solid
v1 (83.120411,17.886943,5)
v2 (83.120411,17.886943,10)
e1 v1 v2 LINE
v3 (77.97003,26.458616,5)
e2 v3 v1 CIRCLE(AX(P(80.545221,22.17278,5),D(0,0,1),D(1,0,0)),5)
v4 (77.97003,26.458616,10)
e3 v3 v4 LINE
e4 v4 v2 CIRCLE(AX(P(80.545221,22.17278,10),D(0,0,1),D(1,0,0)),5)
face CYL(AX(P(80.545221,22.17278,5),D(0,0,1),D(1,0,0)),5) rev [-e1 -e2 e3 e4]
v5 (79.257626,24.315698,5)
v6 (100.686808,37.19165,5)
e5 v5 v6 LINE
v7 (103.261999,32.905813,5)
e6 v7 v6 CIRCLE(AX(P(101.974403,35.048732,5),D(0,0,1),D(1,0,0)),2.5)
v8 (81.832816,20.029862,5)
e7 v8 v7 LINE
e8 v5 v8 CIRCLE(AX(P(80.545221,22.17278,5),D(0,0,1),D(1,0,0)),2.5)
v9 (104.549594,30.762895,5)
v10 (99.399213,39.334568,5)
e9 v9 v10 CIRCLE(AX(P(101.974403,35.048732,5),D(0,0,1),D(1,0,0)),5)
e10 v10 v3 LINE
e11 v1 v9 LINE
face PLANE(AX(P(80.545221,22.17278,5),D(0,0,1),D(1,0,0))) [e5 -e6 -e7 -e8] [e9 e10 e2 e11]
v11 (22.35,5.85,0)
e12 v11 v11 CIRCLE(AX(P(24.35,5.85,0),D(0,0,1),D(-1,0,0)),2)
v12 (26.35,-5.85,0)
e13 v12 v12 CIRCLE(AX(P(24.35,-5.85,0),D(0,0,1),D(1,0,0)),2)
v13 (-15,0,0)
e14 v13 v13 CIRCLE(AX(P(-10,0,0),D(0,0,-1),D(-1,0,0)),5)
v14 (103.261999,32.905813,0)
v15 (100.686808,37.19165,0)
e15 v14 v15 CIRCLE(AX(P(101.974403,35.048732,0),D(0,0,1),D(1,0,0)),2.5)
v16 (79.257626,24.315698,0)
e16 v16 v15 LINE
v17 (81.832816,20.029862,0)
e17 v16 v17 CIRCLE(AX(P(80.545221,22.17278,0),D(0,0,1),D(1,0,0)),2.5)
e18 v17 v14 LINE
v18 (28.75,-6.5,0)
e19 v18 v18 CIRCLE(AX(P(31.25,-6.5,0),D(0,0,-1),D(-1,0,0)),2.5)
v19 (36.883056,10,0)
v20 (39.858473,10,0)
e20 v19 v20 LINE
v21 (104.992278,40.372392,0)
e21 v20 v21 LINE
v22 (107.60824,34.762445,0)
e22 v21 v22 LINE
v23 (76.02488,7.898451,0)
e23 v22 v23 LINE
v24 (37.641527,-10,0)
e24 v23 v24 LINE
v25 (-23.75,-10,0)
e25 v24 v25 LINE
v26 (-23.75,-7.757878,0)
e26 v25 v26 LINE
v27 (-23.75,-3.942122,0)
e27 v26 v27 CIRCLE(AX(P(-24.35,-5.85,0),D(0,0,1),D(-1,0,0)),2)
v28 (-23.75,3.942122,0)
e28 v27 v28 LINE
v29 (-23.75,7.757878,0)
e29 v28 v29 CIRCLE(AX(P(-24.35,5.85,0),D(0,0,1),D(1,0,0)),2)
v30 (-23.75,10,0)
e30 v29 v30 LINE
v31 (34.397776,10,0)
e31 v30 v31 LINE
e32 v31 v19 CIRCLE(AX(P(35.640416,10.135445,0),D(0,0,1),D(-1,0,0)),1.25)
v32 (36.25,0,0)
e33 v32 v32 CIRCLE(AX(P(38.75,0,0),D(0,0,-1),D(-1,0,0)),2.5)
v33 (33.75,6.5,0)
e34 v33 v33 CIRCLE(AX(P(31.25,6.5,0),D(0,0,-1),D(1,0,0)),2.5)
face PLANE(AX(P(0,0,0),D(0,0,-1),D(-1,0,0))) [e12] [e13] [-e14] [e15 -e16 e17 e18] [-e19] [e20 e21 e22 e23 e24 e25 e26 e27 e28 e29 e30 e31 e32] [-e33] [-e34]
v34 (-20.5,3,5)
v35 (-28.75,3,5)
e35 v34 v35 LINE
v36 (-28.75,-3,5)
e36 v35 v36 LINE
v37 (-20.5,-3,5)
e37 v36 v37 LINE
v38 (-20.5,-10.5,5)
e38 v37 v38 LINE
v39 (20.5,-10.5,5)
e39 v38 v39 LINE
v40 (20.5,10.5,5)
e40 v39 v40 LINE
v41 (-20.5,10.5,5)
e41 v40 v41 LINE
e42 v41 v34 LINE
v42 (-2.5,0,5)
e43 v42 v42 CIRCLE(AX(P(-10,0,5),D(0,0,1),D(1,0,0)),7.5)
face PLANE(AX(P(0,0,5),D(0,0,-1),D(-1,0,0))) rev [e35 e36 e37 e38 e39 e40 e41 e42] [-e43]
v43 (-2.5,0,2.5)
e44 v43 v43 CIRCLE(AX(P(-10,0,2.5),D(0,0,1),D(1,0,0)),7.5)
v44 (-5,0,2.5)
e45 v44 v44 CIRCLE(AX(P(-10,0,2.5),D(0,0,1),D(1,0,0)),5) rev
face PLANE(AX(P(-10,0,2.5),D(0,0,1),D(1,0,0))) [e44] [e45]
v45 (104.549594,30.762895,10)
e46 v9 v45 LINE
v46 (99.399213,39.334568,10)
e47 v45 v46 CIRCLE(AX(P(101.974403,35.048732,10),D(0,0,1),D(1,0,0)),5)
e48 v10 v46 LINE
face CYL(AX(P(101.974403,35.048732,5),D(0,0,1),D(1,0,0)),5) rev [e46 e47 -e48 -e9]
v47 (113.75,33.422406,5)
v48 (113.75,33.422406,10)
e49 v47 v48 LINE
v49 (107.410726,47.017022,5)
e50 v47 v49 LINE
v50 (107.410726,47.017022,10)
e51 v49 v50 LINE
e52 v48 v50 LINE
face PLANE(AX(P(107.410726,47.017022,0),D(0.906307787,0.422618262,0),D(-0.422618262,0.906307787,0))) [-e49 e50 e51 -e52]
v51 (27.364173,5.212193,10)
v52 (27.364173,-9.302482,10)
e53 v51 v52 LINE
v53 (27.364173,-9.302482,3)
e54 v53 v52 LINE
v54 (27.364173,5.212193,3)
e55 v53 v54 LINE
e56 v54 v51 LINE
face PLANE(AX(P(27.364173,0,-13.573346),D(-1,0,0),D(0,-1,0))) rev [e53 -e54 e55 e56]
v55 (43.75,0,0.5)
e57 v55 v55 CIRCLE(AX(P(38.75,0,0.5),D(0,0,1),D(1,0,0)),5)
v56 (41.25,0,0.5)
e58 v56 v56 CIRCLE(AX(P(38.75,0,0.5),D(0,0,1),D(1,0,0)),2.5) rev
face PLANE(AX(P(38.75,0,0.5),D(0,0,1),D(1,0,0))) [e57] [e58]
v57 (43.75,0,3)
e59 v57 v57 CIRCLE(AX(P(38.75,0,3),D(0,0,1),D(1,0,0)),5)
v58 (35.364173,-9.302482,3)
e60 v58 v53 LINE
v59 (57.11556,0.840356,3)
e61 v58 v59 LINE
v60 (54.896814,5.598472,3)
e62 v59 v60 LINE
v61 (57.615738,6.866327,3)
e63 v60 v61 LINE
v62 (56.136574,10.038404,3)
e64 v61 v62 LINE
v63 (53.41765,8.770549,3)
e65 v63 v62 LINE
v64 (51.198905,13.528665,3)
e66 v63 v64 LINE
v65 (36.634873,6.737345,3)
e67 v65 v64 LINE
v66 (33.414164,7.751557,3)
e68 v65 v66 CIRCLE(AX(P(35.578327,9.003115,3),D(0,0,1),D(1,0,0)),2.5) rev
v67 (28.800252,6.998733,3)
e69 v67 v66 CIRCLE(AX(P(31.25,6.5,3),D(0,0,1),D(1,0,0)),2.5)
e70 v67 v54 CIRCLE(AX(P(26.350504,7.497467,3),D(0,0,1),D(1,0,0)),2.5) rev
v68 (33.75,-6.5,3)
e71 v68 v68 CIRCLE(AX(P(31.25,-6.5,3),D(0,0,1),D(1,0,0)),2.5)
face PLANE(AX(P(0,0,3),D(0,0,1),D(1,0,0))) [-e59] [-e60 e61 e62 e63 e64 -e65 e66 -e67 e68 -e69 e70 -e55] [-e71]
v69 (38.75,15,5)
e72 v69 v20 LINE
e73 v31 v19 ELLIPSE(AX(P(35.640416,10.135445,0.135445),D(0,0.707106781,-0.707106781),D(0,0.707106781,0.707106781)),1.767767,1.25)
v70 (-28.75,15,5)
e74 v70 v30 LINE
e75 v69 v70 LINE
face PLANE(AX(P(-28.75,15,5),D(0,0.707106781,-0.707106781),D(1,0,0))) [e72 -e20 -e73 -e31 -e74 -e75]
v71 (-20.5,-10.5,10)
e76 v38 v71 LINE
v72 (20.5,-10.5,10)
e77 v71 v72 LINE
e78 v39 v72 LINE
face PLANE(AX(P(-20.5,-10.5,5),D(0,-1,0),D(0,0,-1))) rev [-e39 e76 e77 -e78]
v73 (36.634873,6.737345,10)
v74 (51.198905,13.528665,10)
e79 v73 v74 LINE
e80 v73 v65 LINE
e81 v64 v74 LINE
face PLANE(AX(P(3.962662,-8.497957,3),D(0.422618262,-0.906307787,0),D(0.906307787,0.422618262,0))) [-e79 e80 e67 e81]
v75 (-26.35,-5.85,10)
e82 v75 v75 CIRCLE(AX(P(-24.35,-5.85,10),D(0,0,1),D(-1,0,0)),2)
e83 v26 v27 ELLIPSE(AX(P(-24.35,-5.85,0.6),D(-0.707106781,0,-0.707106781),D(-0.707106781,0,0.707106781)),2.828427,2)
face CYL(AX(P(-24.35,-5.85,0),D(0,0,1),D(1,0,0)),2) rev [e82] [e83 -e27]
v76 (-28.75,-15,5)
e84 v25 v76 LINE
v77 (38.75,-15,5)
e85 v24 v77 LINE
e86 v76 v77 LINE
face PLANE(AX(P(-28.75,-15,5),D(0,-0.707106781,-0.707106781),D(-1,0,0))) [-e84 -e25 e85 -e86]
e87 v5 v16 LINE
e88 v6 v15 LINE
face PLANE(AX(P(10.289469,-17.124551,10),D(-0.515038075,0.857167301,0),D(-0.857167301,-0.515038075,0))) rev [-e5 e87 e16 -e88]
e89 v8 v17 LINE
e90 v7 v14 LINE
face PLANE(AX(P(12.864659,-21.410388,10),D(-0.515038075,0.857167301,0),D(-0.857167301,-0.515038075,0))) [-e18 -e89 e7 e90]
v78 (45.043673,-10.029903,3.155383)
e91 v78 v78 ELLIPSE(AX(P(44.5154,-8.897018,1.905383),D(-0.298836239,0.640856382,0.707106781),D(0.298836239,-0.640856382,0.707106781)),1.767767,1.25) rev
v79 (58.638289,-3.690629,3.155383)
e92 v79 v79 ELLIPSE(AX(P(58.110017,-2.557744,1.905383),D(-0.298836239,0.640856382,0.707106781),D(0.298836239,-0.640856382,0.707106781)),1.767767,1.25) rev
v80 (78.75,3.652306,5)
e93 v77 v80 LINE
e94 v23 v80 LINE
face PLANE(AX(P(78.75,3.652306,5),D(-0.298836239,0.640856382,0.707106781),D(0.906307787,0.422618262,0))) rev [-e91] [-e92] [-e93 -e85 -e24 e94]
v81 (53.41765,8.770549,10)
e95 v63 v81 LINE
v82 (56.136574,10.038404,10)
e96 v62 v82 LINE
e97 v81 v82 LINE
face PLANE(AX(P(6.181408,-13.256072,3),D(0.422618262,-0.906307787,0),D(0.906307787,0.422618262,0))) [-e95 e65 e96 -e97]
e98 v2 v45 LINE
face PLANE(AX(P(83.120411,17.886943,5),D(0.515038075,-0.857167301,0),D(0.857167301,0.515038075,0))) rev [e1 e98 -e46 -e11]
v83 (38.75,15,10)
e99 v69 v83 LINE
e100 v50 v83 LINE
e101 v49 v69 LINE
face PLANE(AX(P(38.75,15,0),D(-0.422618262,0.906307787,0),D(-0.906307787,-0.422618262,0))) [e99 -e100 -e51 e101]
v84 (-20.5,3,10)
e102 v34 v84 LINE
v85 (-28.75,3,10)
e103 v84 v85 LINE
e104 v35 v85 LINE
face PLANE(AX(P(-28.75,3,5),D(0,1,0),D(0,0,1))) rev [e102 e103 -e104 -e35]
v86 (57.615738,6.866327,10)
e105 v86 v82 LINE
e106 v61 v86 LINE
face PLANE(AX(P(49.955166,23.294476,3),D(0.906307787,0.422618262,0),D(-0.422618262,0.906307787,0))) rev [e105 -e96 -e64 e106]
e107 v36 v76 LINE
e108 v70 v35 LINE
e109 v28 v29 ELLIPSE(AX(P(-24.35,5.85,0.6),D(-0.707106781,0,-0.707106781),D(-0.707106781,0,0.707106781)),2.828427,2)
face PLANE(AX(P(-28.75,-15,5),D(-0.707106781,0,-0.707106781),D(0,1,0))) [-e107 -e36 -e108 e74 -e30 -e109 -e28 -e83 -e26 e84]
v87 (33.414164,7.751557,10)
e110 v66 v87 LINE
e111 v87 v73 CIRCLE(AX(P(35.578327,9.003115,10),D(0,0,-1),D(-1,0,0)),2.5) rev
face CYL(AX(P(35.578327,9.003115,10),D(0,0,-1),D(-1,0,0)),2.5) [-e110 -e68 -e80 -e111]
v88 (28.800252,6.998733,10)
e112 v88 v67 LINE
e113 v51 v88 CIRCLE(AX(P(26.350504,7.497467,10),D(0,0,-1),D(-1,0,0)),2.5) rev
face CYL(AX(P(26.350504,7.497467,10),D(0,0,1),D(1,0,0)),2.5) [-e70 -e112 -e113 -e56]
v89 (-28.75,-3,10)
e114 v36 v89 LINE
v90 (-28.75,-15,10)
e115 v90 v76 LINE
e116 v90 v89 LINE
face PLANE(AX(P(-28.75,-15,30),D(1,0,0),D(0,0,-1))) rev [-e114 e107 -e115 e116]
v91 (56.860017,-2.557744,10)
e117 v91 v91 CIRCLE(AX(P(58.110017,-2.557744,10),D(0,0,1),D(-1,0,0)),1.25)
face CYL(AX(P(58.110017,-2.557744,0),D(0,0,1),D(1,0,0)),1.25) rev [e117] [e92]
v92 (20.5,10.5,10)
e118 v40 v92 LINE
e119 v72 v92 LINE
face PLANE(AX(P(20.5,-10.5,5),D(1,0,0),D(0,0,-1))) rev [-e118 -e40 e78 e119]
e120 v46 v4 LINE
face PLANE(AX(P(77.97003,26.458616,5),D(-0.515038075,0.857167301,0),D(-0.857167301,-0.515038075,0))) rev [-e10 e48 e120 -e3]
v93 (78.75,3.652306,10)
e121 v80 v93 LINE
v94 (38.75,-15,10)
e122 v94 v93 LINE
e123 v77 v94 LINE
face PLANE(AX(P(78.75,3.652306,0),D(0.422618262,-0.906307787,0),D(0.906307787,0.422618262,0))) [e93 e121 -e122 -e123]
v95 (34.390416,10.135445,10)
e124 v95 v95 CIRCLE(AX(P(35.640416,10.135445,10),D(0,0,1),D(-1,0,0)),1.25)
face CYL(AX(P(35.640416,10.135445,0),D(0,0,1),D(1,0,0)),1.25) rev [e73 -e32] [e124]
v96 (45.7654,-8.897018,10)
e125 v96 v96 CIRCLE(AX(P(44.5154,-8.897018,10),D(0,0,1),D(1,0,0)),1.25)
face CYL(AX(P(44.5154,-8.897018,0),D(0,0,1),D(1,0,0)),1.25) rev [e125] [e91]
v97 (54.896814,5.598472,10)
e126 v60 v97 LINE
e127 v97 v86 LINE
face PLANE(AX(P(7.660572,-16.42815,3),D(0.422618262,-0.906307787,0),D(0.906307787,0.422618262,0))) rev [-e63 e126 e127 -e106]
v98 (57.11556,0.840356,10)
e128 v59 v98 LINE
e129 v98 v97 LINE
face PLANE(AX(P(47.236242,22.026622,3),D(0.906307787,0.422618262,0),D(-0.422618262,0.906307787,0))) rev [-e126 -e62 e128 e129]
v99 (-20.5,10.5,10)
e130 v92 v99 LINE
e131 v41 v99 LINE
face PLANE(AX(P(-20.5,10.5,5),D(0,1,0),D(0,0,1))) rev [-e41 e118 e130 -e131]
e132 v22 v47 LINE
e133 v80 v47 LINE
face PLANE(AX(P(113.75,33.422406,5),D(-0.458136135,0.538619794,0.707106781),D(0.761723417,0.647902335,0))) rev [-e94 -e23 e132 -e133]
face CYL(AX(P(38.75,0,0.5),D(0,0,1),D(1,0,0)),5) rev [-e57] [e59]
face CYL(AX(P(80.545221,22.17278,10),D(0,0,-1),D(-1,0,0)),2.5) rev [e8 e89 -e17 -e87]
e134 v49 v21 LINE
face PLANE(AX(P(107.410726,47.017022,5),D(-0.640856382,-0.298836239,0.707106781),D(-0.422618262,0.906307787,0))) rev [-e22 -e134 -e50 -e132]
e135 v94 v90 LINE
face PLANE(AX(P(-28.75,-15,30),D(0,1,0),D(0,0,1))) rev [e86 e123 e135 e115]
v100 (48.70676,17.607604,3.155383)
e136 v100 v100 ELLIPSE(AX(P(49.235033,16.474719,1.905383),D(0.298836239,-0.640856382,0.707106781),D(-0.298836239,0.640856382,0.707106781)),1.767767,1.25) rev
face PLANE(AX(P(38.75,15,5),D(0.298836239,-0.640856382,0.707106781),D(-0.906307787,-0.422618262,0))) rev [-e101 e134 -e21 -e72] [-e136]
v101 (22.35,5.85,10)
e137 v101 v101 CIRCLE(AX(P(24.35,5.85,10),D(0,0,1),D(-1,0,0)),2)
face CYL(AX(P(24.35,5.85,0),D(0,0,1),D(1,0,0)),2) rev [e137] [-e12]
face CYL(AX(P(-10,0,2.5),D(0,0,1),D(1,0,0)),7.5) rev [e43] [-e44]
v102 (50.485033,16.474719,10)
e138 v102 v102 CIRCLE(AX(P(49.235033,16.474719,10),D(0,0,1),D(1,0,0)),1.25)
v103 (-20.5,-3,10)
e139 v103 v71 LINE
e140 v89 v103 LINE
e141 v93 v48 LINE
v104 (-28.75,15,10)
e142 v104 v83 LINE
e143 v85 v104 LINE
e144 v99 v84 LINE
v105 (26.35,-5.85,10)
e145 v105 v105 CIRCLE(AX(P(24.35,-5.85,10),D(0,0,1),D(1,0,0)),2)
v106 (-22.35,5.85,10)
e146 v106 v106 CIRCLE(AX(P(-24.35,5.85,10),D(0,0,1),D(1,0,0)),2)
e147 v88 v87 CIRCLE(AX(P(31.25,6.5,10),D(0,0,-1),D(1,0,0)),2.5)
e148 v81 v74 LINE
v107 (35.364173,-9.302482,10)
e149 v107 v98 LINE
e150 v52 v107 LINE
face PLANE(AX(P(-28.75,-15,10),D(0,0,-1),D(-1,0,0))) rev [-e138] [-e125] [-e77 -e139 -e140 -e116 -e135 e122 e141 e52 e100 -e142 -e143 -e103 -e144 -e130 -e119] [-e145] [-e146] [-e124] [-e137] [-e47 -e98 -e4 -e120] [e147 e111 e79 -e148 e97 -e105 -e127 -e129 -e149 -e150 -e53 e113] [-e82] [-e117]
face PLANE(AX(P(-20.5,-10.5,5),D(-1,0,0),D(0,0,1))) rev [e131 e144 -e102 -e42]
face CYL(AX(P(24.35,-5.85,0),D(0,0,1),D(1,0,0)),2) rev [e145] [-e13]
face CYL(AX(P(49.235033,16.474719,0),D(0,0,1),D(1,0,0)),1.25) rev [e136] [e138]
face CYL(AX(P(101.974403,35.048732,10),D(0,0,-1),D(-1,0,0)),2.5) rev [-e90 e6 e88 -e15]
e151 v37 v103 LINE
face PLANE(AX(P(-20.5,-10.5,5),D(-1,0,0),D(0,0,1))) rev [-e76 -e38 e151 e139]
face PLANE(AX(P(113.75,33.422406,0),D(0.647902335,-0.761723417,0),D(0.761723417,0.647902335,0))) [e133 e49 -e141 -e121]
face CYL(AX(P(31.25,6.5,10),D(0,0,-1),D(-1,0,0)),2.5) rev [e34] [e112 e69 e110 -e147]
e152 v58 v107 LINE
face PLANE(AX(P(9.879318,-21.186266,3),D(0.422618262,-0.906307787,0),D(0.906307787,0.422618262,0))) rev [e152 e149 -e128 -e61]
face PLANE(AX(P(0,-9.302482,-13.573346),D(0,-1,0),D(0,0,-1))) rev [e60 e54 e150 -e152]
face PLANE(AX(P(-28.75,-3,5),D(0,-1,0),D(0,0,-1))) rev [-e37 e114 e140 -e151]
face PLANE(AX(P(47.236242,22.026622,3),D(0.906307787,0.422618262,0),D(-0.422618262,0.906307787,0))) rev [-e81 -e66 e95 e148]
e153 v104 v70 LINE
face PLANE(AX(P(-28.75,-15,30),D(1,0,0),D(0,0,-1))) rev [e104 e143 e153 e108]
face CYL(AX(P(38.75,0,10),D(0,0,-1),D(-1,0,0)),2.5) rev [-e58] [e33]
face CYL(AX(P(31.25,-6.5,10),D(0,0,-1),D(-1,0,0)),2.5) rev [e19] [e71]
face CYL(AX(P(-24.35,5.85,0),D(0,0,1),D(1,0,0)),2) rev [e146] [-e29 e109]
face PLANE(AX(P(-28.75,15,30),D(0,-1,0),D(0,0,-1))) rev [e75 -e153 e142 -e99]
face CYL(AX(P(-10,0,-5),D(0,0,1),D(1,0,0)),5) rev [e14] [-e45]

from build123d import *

# Parameters (mm, degrees)
SKETCH1_W                = 57.5
SKETCH1_H                = 30
BOSS_EXTRUDE1_DEPTH      = 30
SKETCH2_W                = 41
SKETCH2_H                = 21
CUT_EXTRUDE1_DEPTH       = 25
SKETCH8_R                = 2
CUT_EXTRUDE6_DEPTH       = 10
SKETCH10_R               = 5
CUT_EXTRUDE8_DEPTH       = 10
BOSS_EXTRUDE4_DEPTH      = 30
SKETCH16_R               = 5
CUT_EXTRUDE10_DEPTH      = 30
CHAMFER5_SIZE            = 5
SKETCH20_R               = 7.5
CUT_EXTRUDE13_DEPTH      = 2.5
CUT_EXTRUDE16_DEPTH      = 122.918629513
CUT_EXTRUDE16_DEPTH_BACK = 122.918629513
SKETCH30_W               = 142.5
SKETCH30_H               = 20
CUT_EXTRUDE17_DEPTH      = 7
CUT_EXTRUDE19_DEPTH      = 124.489525441
SKETCH35_R               = 2.5
CUT_EXTRUDE21_DEPTH      = 124.489525441
SKETCH37_W               = 8.25
SKETCH37_H               = 6
CUT_EXTRUDE23_DEPTH      = 5
CUT_EXTRUDE24_DEPTH      = 5
SKETCH40_R               = 5
CUT_EXTRUDE25_DEPTH      = 2.5
SKETCH41_R               = 2
CUT_EXTRUDE26_DEPTH      = 10
CUT_EXTRUDE27_DEPTH      = 7
FILLET3_R                = 2.5
FILLET4_R                = 2.5
SKETCH45_R               = 1.25
CUT_EXTRUDE28_DEPTH      = 124.489525441


with BuildPart() as part:
    # Sketch1 → Boss-Extrude1 (new body)
    with BuildSketch(Plane.XY):
        Rectangle(SKETCH1_W, SKETCH1_H)
    extrude(amount=BOSS_EXTRUDE1_DEPTH)

    # Sketch2 → Cut-Extrude1 (cut)
    with BuildSketch(Plane.XY.offset(30)):
        Rectangle(SKETCH2_W, SKETCH2_H)
    extrude(amount=-CUT_EXTRUDE1_DEPTH, mode=Mode.SUBTRACT)

    # Sketch8 → Cut-Extrude6 (cut)
    with BuildSketch(Plane.XY.offset(30)):
        with Locations((24.35, 6)):
            Circle(SKETCH8_R)
        with Locations(Location((24.35, -6, 0), (0, 0, 180))):
            Circle(SKETCH8_R)
        with Locations((-24.35, -6)):
            Circle(SKETCH8_R)
        with Locations(Location((-24.35, 6, 0), (0, 0, 180))):
            Circle(SKETCH8_R)
    extrude(amount=-CUT_EXTRUDE6_DEPTH, mode=Mode.SUBTRACT)

    # Sketch10 → Cut-Extrude8 (cut)
    with BuildSketch(Plane.XY.offset(5)):
        with Locations((-10, 0)):
            Circle(SKETCH10_R)
    extrude(amount=-CUT_EXTRUDE8_DEPTH, mode=Mode.SUBTRACT)

    # Sketch13 → Boss-Extrude4 (add)
    with BuildSketch(Plane.XY.offset(30)):
        Polygon((28.75, 15), (38.75, 15), (107.410726074, 47.017022383), (113.75, 33.422405577), (78.75, 3.652306326), (38.75, -15), (28.75, -15), align=None)
    extrude(amount=-BOSS_EXTRUDE4_DEPTH)

    # Sketch16 → Cut-Extrude10 (cut)
    with BuildSketch(Plane(origin=(1.175656739, -2.521204013, 0), x_dir=(0.9063077870366488, 0.42261826174070183, 0), z_dir=(-0.42261826174070183, 0.9063077870366488, 0))):
        with Locations(Location((97.217429724, -15, 0), (0, 0, 180))):
            Circle(SKETCH16_R)
        with BuildLine():
            Line((67.217429724, -12.5), (82.217429724, -12.5))
            ThreePointArc((82.217429724, -12.5), (84.717429724, -15), (82.217429724, -17.5))
            Line((82.217429724, -17.5), (67.217429724, -17.5))
            ThreePointArc((67.217429724, -17.5), (64.717429724, -15), (67.217429724, -12.5))
        make_face()
    extrude(amount=-CUT_EXTRUDE10_DEPTH, mode=Mode.SUBTRACT)

    # Chamfer5
    # the kernel refuses this chamfer: 5 mm, written as the material it takes off along each edge
    with BuildSketch(Plane(origin=(-28.75, 27.85841494, 0), x_dir=(-0.027495876610586317, 0, 0.9996219169112968), z_dir=(0, -1, 0))) as chamfer5_piece_1:
        Polygon((CHAMFER5_SIZE * 0.999621916911, -CHAMFER5_SIZE * 0.0274958766106), (-CHAMFER5_SIZE * 0.0274958766106, -CHAMFER5_SIZE * 0.999621916911), (0, 0), align=None)
    extrude(amount=55.71682988, mode=Mode.SUBTRACT)
    with BuildSketch(Plane(origin=(-41.60841494, -15, 0), x_dir=(0, -0.027495876610586317, 0.9996219169112968), z_dir=(1, 0, 0)), Plane(origin=(51.60841494, -15, 30), x_dir=(0, -0.027495876610586317, -0.9996219169112968), z_dir=(-1, 0, 0))) as chamfer5_piece_2:
        Polygon((CHAMFER5_SIZE * 0.999621916911, -CHAMFER5_SIZE * 0.0274958766106), (-CHAMFER5_SIZE * 0.0274958766106, -CHAMFER5_SIZE * 0.999621916911), (0, 0), align=None)
    extrude(amount=93.21682988, mode=Mode.SUBTRACT)
    with BuildSketch(Plane(origin=(90.403681589, 9.086507297, 30), x_dir=(-0.4224584769229526, 0.905965127389214, 0.02749587661058631), z_dir=(-0.9063077870366526, -0.4226182617406939, 0)), Plane(origin=(90.403681589, 9.086507297, 0), x_dir=(0.011620259578202724, -0.024919727083573626, 0.9996219169112968), z_dir=(-0.9063077870366526, -0.4226182617406939, 0))) as chamfer5_piece_3:
        Polygon((CHAMFER5_SIZE * 0.999621916911, CHAMFER5_SIZE * 0.0274958766106), (-CHAMFER5_SIZE * 0.0274958766106, CHAMFER5_SIZE * 0.999621916911), (0, 0), align=None)
    extrude(amount=69.851946638, mode=Mode.SUBTRACT)
    with BuildSketch(Plane(origin=(123.544555766, 41.753402643, 0), x_dir=(-0.6476573741944397, 0.7614354223576539, -0.027495876610586414), z_dir=(-0.7617234170999287, -0.6479023351104763, 0))) as chamfer5_piece_4:
        Polygon((CHAMFER5_SIZE * 0.999621916911, -CHAMFER5_SIZE * 0.0274958766106), (-CHAMFER5_SIZE * 0.0274958766106, -CHAMFER5_SIZE * 0.999621916911), (0, 0), align=None)
    extrude(amount=71.665266299, mode=Mode.SUBTRACT)
    with BuildSketch(Plane(origin=(123.544555766, 41.753402643, 30), x_dir=(-0.6476573741944397, 0.7614354223576539, 0.02749587661058634), z_dir=(-0.7617234170999287, -0.6479023351104763, 0))) as chamfer5_piece_5:
        Polygon((CHAMFER5_SIZE * 0.999621916911, CHAMFER5_SIZE * 0.0274958766106), (-CHAMFER5_SIZE * 0.0274958766106, CHAMFER5_SIZE * 0.999621916911), (0, 0), align=None)
    extrude(amount=71.665266299, mode=Mode.SUBTRACT)
    with BuildSketch(Plane(origin=(101.976525103, 58.670703972, 30), x_dir=(-0.9059651273892108, -0.42245847692295924, 0.027495876610586337), z_dir=(0.42261826174070055, -0.9063077870366495, 0))) as chamfer5_piece_6:
        Polygon((CHAMFER5_SIZE * 0.999621916911, CHAMFER5_SIZE * 0.0274958766106), (-CHAMFER5_SIZE * 0.0274958766106, CHAMFER5_SIZE * 0.999621916911), (0, 0), align=None)
    extrude(amount=40.71682988, mode=Mode.SUBTRACT)
    with BuildSketch(Plane(origin=(101.976525103, 58.670703972, 0), x_dir=(-0.9059651273892108, -0.42245847692295924, -0.027495876610586344), z_dir=(0.42261826174070055, -0.9063077870366495, 0))) as chamfer5_piece_7:
        Polygon((CHAMFER5_SIZE * 0.999621916911, -CHAMFER5_SIZE * 0.0274958766106), (-CHAMFER5_SIZE * 0.0274958766106, -CHAMFER5_SIZE * 0.999621916911), (0, 0), align=None)
    extrude(amount=40.71682988, mode=Mode.SUBTRACT)
    with BuildSketch(Plane(origin=(27.096318411, 9.565799029, 30), x_dir=(0.4224584769229604, -0.9059651273892103, 0.027495876610586313), z_dir=(0.9063077870366489, 0.4226182617407018, 0))) as chamfer5_piece_8_section:
        Polygon((CHAMFER5_SIZE * 0.999621916911, CHAMFER5_SIZE * 0.0274958766106), (-CHAMFER5_SIZE * 0.0274958766106, CHAMFER5_SIZE * 0.999621916911), (0, 0), align=None)
    chamfer5_piece_8 = extrude(amount=101.47555893, mode=Mode.PRIVATE)
    chamfer5_piece_8 = split(chamfer5_piece_8, bisect_by=Plane(origin=(81.150743587, 15, 28.329639499), z_dir=(0, 1, 0)), keep=Keep.TOP, mode=Mode.PRIVATE)
    add(chamfer5_piece_8, mode=Mode.SUBTRACT)
    with BuildSketch(Plane(origin=(27.096318411, 9.565799029, 0), x_dir=(0.4224584769229604, -0.9059651273892103, -0.02749587661058636), z_dir=(0.9063077870366489, 0.4226182617407018, 0))) as chamfer5_piece_9_section:
        Polygon((CHAMFER5_SIZE * 0.999621916911, -CHAMFER5_SIZE * 0.0274958766106), (-CHAMFER5_SIZE * 0.0274958766106, -CHAMFER5_SIZE * 0.999621916911), (0, 0), align=None)
    chamfer5_piece_9 = extrude(amount=101.47555893, mode=Mode.PRIVATE)
    chamfer5_piece_9 = split(chamfer5_piece_9, bisect_by=Plane(origin=(81.150743587, 15, 1.670360501), z_dir=(0, 1, 0)), keep=Keep.TOP, mode=Mode.PRIVATE)
    add(chamfer5_piece_9, mode=Mode.SUBTRACT)
    with BuildSketch(Plane(origin=(-41.60841494, 15, 0), x_dir=(0, -0.9996219169112968, -0.027495876610586372), z_dir=(1, 0, 0))) as chamfer5_piece_10_section:
        Polygon((CHAMFER5_SIZE * 0.999621916911, -CHAMFER5_SIZE * 0.0274958766106), (-CHAMFER5_SIZE * 0.0274958766106, -CHAMFER5_SIZE * 0.999621916911), (0, 0), align=None)
    chamfer5_piece_10 = extrude(amount=93.21682988, mode=Mode.PRIVATE)
    chamfer5_piece_10 = split(chamfer5_piece_10, bisect_by=Plane(origin=(3.719146846, -1.335155097, 1.672660276), z_dir=(-0.4226182617407018, 0.9063077870366489, 0)), keep=Keep.TOP, mode=Mode.PRIVATE)
    add(chamfer5_piece_10, mode=Mode.SUBTRACT)
    with BuildSketch(Plane(origin=(51.60841494, 15, 30), x_dir=(0, -0.9996219169112968, 0.027495876610586317), z_dir=(-1, 0, 0))) as chamfer5_piece_11_section:
        Polygon((CHAMFER5_SIZE * 0.999621916911, -CHAMFER5_SIZE * 0.0274958766106), (-CHAMFER5_SIZE * 0.0274958766106, -CHAMFER5_SIZE * 0.999621916911), (0, 0), align=None)
    chamfer5_piece_11 = extrude(amount=93.21682988, mode=Mode.PRIVATE)
    chamfer5_piece_11 = split(chamfer5_piece_11, bisect_by=Plane(origin=(3.719146846, -1.335155097, 28.327339724), z_dir=(-0.4226182617407018, 0.9063077870366489, 0)), keep=Keep.TOP, mode=Mode.PRIVATE)
    add(chamfer5_piece_11, mode=Mode.SUBTRACT)
    with BuildSketch(Plane(origin=(27.096318411, 9.565799029, 30), x_dir=(0.4224584769229604, -0.9059651273892103, 0.027495876610586313), z_dir=(0.9063077870366489, 0.4226182617407018, 0))) as chamfer5_piece_12a_section:
        Polygon((CHAMFER5_SIZE * 0.999621916911, CHAMFER5_SIZE * 0.0274958766106), (-CHAMFER5_SIZE * 0.0274958766106, CHAMFER5_SIZE * 0.999621916911), (0, 0), align=None)
    chamfer5_piece_12a = extrude(amount=101.47555893, mode=Mode.PRIVATE)
    chamfer5_piece_12a = split(chamfer5_piece_12a, bisect_by=Plane(origin=(35.512062488, 15, 28.462048788), z_dir=(0, -1, 0)), keep=Keep.TOP, mode=Mode.PRIVATE)
    with BuildSketch(Plane(origin=(51.60841494, 15, 30), x_dir=(0, -0.9996219169112968, 0.027495876610586317), z_dir=(-1, 0, 0))) as chamfer5_piece_12b_section:
        Polygon((CHAMFER5_SIZE * 0.999621916911, -CHAMFER5_SIZE * 0.0274958766106), (-CHAMFER5_SIZE * 0.0274958766106, -CHAMFER5_SIZE * 0.999621916911), (0, 0), align=None)
    chamfer5_piece_12b = extrude(amount=93.21682988, mode=Mode.PRIVATE)
    chamfer5_piece_12b = split(chamfer5_piece_12b, bisect_by=Plane(origin=(41.684567981, 16.368411523, 28.462048788), z_dir=(0.4226182617407018, -0.9063077870366489, 0)), keep=Keep.TOP, mode=Mode.PRIVATE)
    chamfer5_piece_12 = chamfer5_piece_12a & chamfer5_piece_12b
    add(chamfer5_piece_12, mode=Mode.SUBTRACT)
    with BuildSketch(Plane(origin=(27.096318411, 9.565799029, 0), x_dir=(0.4224584769229604, -0.9059651273892103, -0.02749587661058636), z_dir=(0.9063077870366489, 0.4226182617407018, 0))) as chamfer5_piece_13a_section:
        Polygon((CHAMFER5_SIZE * 0.999621916911, -CHAMFER5_SIZE * 0.0274958766106), (-CHAMFER5_SIZE * 0.0274958766106, -CHAMFER5_SIZE * 0.999621916911), (0, 0), align=None)
    chamfer5_piece_13a = extrude(amount=101.47555893, mode=Mode.PRIVATE)
    chamfer5_piece_13a = split(chamfer5_piece_13a, bisect_by=Plane(origin=(35.512062488, 15, 1.537951212), z_dir=(0, -1, 0)), keep=Keep.TOP, mode=Mode.PRIVATE)
    with BuildSketch(Plane(origin=(-41.60841494, 15, 0), x_dir=(0, -0.9996219169112968, -0.027495876610586372), z_dir=(1, 0, 0))) as chamfer5_piece_13b_section:
        Polygon((CHAMFER5_SIZE * 0.999621916911, -CHAMFER5_SIZE * 0.0274958766106), (-CHAMFER5_SIZE * 0.0274958766106, -CHAMFER5_SIZE * 0.999621916911), (0, 0), align=None)
    chamfer5_piece_13b = extrude(amount=93.21682988, mode=Mode.PRIVATE)
    chamfer5_piece_13b = split(chamfer5_piece_13b, bisect_by=Plane(origin=(41.684567981, 16.368411523, 1.537951212), z_dir=(0.4226182617407018, -0.9063077870366489, 0)), keep=Keep.TOP, mode=Mode.PRIVATE)
    chamfer5_piece_13 = chamfer5_piece_13a & chamfer5_piece_13b
    add(chamfer5_piece_13, mode=Mode.SUBTRACT)

    # Sketch20 → Cut-Extrude13 (cut)
    with BuildSketch(Plane.XY.offset(5)):
        with Locations((-10, 0)):
            Circle(SKETCH20_R)
    extrude(amount=-CUT_EXTRUDE13_DEPTH, mode=Mode.SUBTRACT)

    # Sketch30 → Cut-Extrude16 (cut, two sides: drawn at the far end of the back side and taken through both)
    with BuildSketch(Plane(origin=(0, 15, 0), x_dir=(1, 0, 0), z_dir=(0, 1, 0)).offset(-CUT_EXTRUDE16_DEPTH_BACK)):
        with Locations((42.5, -20)):
            Rectangle(SKETCH30_W, SKETCH30_H)
    extrude(amount=CUT_EXTRUDE16_DEPTH + CUT_EXTRUDE16_DEPTH_BACK, mode=Mode.SUBTRACT)

    # Sketch31 → Cut-Extrude17 (cut)
    with BuildSketch(Plane.XY.offset(10)):
        Polygon((29.447517659, 3.385826677), (31.666263533, -1.372289205), (53.417650422, 8.770549077), (51.198904547, 13.528664959), align=None)
        Polygon((54.896814338, 5.598471822), (33.145427449, -4.544366459), (35.364173323, -9.302482341), (57.115560212, 0.84035594), align=None)
        Polygon((28.947340172, -2.64014399), (30.426504088, -5.812221245), (33.145427449, -4.544366459), (31.666263533, -1.372289205), align=None)
        Polygon((31.666263533, -1.372289205), (33.145427449, -4.544366459), (54.896814338, 5.598471822), (53.417650422, 8.770549077), align=None)
        Polygon((53.417650422, 8.770549077), (54.896814338, 5.598471822), (57.615737699, 6.866326607), (56.136573783, 10.038403862), align=None)
    extrude(amount=-CUT_EXTRUDE17_DEPTH, mode=Mode.SUBTRACT)

    # Sketch33 → Cut-Extrude19 (cut, through all)
    with BuildSketch(Plane.XY):
        with BuildLine():
            Line((81.832816008, 20.029861583), (103.261998525, 32.905813456))
            ThreePointArc((103.261998525, 32.905813456), (104.11732159, 36.336326895), (100.686808151, 37.19164996))
            Line((100.686808151, 37.19164996), (79.257625633, 24.315698087))
            ThreePointArc((79.257625633, 24.315698087), (78.402302569, 20.885184648), (81.832816008, 20.029861583))
        make_face()
    extrude(amount=CUT_EXTRUDE19_DEPTH, mode=Mode.SUBTRACT)

    # Sketch35 → Cut-Extrude21 (cut, through all)
    with BuildSketch(Plane(origin=(0, 0, 0), x_dir=(-1, 0, 0), z_dir=(0, 0, -1))):
        with Locations((-38.75, 0)):
            Circle(SKETCH35_R)
        with Locations((-31.25, -6.5)):
            Circle(SKETCH35_R)
        with Locations(Location((-31.25, 6.5, 0), (0, 0, 279.486964522))):
            Circle(SKETCH35_R)
    extrude(amount=-CUT_EXTRUDE21_DEPTH, mode=Mode.SUBTRACT)

    # Sketch37 → Cut-Extrude23 (cut)
    with BuildSketch(Plane.XY.offset(10)):
        with Locations((-24.625, 0)):
            Rectangle(SKETCH37_W, SKETCH37_H)
    extrude(amount=-CUT_EXTRUDE23_DEPTH, mode=Mode.SUBTRACT)

    # Sketch38 → Cut-Extrude24 (cut)
    with BuildSketch(Plane.XY.offset(10)):
        with BuildLine():
            Line((77.970030446, 26.458616339), (99.399212963, 39.334568211))
            ThreePointArc((99.399212963, 39.334568211), (106.260239841, 37.623922082), (104.549593712, 30.762895204))
            Line((104.549593712, 30.762895204), (83.120411195, 17.886943332))
            ThreePointArc((83.120411195, 17.886943332), (76.259384317, 19.597589461), (77.970030446, 26.458616339))
        make_face()
    extrude(amount=-CUT_EXTRUDE24_DEPTH, mode=Mode.SUBTRACT)

    # Sketch40 → Cut-Extrude25 (cut)
    with BuildSketch(Plane.XY.offset(3)):
        with Locations((38.75, 0)):
            Circle(SKETCH40_R)
    extrude(amount=-CUT_EXTRUDE25_DEPTH, mode=Mode.SUBTRACT)

    # Sketch41 → Cut-Extrude26 (cut)
    with BuildSketch(Plane.XY.offset(10)):
        with Locations((-24.35, 5.85)):
            Circle(SKETCH41_R)
        with Locations(Location((-24.35, -5.85, 0), (0, 0, 287.457603124))):
            Circle(SKETCH41_R)
        with Locations((24.35, -5.85)):
            Circle(SKETCH41_R)
        with Locations(Location((24.35, 5.85, 0), (0, 0, 180))):
            Circle(SKETCH41_R)
    extrude(amount=-CUT_EXTRUDE26_DEPTH, mode=Mode.SUBTRACT)

    # Sketch44 → Cut-Extrude27 (cut)
    with BuildSketch(Plane.XY.offset(10)):
        Polygon((27.364173323, -9.302482341), (35.364173323, -9.302482341), (33.364173323, 5.212193208), (27.364173323, 5.212193208), align=None)
    extrude(amount=-CUT_EXTRUDE27_DEPTH, mode=Mode.SUBTRACT)

    # Fillet3
    fillet3_edges = [part.edges().sort_by_distance(p)[0] for p in [
        (33.403784168, 5.230664048, 6.5),
    ]]
    fillet(fillet3_edges, radius=FILLET3_R)

    # Fillet4
    # the kernel refuses this fillet: 2.5 mm, written as the material it takes off along each edge
    with BuildSketch(Plane(origin=(29.107208908, 5.212193208, 14.531796065), x_dir=(-0.1693351073344651, 0.985558532723463, 0), z_dir=(0, 0, -1))) as fillet4_piece_1:
        with BuildLine():
            CenterArc((2.719077639, -2.329916946), FILLET4_R, 111.256494855, 54.572229345)
            Line((0.295157118, -1.717863593), (0.246678707, -1.705622526))
            ThreePointArc((0.246678707, -1.705622526), (0.098300632, -0.867398552), (-0.049277927, -0.008466755))
            Line((-0.049277927, -0.008466755), (0.018127184, 0.046598339))
            ThreePointArc((0.018127184, 0.046598339), (0.906359213, -0.120083054), (1.794591242, 0.046598339))
            Line((1.794591242, 0.046598339), (1.812718426, 0))
        make_face()
    extrude(amount=11.531796065, mode=Mode.SUBTRACT)

    # Sketch45 → Cut-Extrude28 (cut, through all)
    with BuildSketch(Plane.XY.offset(10)):
        with Locations((49.235033159, 16.474719407)):
            Circle(SKETCH45_R)
        with Locations(Location((35.640416354, 10.135445481, 0), (0, 0, 353.779422979))):
            Circle(SKETCH45_R)
        with Locations(Location((58.110016656, -2.557744121, 0), (0, 0, 295))):
            Circle(SKETCH45_R)
        with Locations((44.51539985, -8.897018047)):
            Circle(SKETCH45_R)
    extrude(amount=-CUT_EXTRUDE28_DEPTH, mode=Mode.SUBTRACT)


solid = part.part
